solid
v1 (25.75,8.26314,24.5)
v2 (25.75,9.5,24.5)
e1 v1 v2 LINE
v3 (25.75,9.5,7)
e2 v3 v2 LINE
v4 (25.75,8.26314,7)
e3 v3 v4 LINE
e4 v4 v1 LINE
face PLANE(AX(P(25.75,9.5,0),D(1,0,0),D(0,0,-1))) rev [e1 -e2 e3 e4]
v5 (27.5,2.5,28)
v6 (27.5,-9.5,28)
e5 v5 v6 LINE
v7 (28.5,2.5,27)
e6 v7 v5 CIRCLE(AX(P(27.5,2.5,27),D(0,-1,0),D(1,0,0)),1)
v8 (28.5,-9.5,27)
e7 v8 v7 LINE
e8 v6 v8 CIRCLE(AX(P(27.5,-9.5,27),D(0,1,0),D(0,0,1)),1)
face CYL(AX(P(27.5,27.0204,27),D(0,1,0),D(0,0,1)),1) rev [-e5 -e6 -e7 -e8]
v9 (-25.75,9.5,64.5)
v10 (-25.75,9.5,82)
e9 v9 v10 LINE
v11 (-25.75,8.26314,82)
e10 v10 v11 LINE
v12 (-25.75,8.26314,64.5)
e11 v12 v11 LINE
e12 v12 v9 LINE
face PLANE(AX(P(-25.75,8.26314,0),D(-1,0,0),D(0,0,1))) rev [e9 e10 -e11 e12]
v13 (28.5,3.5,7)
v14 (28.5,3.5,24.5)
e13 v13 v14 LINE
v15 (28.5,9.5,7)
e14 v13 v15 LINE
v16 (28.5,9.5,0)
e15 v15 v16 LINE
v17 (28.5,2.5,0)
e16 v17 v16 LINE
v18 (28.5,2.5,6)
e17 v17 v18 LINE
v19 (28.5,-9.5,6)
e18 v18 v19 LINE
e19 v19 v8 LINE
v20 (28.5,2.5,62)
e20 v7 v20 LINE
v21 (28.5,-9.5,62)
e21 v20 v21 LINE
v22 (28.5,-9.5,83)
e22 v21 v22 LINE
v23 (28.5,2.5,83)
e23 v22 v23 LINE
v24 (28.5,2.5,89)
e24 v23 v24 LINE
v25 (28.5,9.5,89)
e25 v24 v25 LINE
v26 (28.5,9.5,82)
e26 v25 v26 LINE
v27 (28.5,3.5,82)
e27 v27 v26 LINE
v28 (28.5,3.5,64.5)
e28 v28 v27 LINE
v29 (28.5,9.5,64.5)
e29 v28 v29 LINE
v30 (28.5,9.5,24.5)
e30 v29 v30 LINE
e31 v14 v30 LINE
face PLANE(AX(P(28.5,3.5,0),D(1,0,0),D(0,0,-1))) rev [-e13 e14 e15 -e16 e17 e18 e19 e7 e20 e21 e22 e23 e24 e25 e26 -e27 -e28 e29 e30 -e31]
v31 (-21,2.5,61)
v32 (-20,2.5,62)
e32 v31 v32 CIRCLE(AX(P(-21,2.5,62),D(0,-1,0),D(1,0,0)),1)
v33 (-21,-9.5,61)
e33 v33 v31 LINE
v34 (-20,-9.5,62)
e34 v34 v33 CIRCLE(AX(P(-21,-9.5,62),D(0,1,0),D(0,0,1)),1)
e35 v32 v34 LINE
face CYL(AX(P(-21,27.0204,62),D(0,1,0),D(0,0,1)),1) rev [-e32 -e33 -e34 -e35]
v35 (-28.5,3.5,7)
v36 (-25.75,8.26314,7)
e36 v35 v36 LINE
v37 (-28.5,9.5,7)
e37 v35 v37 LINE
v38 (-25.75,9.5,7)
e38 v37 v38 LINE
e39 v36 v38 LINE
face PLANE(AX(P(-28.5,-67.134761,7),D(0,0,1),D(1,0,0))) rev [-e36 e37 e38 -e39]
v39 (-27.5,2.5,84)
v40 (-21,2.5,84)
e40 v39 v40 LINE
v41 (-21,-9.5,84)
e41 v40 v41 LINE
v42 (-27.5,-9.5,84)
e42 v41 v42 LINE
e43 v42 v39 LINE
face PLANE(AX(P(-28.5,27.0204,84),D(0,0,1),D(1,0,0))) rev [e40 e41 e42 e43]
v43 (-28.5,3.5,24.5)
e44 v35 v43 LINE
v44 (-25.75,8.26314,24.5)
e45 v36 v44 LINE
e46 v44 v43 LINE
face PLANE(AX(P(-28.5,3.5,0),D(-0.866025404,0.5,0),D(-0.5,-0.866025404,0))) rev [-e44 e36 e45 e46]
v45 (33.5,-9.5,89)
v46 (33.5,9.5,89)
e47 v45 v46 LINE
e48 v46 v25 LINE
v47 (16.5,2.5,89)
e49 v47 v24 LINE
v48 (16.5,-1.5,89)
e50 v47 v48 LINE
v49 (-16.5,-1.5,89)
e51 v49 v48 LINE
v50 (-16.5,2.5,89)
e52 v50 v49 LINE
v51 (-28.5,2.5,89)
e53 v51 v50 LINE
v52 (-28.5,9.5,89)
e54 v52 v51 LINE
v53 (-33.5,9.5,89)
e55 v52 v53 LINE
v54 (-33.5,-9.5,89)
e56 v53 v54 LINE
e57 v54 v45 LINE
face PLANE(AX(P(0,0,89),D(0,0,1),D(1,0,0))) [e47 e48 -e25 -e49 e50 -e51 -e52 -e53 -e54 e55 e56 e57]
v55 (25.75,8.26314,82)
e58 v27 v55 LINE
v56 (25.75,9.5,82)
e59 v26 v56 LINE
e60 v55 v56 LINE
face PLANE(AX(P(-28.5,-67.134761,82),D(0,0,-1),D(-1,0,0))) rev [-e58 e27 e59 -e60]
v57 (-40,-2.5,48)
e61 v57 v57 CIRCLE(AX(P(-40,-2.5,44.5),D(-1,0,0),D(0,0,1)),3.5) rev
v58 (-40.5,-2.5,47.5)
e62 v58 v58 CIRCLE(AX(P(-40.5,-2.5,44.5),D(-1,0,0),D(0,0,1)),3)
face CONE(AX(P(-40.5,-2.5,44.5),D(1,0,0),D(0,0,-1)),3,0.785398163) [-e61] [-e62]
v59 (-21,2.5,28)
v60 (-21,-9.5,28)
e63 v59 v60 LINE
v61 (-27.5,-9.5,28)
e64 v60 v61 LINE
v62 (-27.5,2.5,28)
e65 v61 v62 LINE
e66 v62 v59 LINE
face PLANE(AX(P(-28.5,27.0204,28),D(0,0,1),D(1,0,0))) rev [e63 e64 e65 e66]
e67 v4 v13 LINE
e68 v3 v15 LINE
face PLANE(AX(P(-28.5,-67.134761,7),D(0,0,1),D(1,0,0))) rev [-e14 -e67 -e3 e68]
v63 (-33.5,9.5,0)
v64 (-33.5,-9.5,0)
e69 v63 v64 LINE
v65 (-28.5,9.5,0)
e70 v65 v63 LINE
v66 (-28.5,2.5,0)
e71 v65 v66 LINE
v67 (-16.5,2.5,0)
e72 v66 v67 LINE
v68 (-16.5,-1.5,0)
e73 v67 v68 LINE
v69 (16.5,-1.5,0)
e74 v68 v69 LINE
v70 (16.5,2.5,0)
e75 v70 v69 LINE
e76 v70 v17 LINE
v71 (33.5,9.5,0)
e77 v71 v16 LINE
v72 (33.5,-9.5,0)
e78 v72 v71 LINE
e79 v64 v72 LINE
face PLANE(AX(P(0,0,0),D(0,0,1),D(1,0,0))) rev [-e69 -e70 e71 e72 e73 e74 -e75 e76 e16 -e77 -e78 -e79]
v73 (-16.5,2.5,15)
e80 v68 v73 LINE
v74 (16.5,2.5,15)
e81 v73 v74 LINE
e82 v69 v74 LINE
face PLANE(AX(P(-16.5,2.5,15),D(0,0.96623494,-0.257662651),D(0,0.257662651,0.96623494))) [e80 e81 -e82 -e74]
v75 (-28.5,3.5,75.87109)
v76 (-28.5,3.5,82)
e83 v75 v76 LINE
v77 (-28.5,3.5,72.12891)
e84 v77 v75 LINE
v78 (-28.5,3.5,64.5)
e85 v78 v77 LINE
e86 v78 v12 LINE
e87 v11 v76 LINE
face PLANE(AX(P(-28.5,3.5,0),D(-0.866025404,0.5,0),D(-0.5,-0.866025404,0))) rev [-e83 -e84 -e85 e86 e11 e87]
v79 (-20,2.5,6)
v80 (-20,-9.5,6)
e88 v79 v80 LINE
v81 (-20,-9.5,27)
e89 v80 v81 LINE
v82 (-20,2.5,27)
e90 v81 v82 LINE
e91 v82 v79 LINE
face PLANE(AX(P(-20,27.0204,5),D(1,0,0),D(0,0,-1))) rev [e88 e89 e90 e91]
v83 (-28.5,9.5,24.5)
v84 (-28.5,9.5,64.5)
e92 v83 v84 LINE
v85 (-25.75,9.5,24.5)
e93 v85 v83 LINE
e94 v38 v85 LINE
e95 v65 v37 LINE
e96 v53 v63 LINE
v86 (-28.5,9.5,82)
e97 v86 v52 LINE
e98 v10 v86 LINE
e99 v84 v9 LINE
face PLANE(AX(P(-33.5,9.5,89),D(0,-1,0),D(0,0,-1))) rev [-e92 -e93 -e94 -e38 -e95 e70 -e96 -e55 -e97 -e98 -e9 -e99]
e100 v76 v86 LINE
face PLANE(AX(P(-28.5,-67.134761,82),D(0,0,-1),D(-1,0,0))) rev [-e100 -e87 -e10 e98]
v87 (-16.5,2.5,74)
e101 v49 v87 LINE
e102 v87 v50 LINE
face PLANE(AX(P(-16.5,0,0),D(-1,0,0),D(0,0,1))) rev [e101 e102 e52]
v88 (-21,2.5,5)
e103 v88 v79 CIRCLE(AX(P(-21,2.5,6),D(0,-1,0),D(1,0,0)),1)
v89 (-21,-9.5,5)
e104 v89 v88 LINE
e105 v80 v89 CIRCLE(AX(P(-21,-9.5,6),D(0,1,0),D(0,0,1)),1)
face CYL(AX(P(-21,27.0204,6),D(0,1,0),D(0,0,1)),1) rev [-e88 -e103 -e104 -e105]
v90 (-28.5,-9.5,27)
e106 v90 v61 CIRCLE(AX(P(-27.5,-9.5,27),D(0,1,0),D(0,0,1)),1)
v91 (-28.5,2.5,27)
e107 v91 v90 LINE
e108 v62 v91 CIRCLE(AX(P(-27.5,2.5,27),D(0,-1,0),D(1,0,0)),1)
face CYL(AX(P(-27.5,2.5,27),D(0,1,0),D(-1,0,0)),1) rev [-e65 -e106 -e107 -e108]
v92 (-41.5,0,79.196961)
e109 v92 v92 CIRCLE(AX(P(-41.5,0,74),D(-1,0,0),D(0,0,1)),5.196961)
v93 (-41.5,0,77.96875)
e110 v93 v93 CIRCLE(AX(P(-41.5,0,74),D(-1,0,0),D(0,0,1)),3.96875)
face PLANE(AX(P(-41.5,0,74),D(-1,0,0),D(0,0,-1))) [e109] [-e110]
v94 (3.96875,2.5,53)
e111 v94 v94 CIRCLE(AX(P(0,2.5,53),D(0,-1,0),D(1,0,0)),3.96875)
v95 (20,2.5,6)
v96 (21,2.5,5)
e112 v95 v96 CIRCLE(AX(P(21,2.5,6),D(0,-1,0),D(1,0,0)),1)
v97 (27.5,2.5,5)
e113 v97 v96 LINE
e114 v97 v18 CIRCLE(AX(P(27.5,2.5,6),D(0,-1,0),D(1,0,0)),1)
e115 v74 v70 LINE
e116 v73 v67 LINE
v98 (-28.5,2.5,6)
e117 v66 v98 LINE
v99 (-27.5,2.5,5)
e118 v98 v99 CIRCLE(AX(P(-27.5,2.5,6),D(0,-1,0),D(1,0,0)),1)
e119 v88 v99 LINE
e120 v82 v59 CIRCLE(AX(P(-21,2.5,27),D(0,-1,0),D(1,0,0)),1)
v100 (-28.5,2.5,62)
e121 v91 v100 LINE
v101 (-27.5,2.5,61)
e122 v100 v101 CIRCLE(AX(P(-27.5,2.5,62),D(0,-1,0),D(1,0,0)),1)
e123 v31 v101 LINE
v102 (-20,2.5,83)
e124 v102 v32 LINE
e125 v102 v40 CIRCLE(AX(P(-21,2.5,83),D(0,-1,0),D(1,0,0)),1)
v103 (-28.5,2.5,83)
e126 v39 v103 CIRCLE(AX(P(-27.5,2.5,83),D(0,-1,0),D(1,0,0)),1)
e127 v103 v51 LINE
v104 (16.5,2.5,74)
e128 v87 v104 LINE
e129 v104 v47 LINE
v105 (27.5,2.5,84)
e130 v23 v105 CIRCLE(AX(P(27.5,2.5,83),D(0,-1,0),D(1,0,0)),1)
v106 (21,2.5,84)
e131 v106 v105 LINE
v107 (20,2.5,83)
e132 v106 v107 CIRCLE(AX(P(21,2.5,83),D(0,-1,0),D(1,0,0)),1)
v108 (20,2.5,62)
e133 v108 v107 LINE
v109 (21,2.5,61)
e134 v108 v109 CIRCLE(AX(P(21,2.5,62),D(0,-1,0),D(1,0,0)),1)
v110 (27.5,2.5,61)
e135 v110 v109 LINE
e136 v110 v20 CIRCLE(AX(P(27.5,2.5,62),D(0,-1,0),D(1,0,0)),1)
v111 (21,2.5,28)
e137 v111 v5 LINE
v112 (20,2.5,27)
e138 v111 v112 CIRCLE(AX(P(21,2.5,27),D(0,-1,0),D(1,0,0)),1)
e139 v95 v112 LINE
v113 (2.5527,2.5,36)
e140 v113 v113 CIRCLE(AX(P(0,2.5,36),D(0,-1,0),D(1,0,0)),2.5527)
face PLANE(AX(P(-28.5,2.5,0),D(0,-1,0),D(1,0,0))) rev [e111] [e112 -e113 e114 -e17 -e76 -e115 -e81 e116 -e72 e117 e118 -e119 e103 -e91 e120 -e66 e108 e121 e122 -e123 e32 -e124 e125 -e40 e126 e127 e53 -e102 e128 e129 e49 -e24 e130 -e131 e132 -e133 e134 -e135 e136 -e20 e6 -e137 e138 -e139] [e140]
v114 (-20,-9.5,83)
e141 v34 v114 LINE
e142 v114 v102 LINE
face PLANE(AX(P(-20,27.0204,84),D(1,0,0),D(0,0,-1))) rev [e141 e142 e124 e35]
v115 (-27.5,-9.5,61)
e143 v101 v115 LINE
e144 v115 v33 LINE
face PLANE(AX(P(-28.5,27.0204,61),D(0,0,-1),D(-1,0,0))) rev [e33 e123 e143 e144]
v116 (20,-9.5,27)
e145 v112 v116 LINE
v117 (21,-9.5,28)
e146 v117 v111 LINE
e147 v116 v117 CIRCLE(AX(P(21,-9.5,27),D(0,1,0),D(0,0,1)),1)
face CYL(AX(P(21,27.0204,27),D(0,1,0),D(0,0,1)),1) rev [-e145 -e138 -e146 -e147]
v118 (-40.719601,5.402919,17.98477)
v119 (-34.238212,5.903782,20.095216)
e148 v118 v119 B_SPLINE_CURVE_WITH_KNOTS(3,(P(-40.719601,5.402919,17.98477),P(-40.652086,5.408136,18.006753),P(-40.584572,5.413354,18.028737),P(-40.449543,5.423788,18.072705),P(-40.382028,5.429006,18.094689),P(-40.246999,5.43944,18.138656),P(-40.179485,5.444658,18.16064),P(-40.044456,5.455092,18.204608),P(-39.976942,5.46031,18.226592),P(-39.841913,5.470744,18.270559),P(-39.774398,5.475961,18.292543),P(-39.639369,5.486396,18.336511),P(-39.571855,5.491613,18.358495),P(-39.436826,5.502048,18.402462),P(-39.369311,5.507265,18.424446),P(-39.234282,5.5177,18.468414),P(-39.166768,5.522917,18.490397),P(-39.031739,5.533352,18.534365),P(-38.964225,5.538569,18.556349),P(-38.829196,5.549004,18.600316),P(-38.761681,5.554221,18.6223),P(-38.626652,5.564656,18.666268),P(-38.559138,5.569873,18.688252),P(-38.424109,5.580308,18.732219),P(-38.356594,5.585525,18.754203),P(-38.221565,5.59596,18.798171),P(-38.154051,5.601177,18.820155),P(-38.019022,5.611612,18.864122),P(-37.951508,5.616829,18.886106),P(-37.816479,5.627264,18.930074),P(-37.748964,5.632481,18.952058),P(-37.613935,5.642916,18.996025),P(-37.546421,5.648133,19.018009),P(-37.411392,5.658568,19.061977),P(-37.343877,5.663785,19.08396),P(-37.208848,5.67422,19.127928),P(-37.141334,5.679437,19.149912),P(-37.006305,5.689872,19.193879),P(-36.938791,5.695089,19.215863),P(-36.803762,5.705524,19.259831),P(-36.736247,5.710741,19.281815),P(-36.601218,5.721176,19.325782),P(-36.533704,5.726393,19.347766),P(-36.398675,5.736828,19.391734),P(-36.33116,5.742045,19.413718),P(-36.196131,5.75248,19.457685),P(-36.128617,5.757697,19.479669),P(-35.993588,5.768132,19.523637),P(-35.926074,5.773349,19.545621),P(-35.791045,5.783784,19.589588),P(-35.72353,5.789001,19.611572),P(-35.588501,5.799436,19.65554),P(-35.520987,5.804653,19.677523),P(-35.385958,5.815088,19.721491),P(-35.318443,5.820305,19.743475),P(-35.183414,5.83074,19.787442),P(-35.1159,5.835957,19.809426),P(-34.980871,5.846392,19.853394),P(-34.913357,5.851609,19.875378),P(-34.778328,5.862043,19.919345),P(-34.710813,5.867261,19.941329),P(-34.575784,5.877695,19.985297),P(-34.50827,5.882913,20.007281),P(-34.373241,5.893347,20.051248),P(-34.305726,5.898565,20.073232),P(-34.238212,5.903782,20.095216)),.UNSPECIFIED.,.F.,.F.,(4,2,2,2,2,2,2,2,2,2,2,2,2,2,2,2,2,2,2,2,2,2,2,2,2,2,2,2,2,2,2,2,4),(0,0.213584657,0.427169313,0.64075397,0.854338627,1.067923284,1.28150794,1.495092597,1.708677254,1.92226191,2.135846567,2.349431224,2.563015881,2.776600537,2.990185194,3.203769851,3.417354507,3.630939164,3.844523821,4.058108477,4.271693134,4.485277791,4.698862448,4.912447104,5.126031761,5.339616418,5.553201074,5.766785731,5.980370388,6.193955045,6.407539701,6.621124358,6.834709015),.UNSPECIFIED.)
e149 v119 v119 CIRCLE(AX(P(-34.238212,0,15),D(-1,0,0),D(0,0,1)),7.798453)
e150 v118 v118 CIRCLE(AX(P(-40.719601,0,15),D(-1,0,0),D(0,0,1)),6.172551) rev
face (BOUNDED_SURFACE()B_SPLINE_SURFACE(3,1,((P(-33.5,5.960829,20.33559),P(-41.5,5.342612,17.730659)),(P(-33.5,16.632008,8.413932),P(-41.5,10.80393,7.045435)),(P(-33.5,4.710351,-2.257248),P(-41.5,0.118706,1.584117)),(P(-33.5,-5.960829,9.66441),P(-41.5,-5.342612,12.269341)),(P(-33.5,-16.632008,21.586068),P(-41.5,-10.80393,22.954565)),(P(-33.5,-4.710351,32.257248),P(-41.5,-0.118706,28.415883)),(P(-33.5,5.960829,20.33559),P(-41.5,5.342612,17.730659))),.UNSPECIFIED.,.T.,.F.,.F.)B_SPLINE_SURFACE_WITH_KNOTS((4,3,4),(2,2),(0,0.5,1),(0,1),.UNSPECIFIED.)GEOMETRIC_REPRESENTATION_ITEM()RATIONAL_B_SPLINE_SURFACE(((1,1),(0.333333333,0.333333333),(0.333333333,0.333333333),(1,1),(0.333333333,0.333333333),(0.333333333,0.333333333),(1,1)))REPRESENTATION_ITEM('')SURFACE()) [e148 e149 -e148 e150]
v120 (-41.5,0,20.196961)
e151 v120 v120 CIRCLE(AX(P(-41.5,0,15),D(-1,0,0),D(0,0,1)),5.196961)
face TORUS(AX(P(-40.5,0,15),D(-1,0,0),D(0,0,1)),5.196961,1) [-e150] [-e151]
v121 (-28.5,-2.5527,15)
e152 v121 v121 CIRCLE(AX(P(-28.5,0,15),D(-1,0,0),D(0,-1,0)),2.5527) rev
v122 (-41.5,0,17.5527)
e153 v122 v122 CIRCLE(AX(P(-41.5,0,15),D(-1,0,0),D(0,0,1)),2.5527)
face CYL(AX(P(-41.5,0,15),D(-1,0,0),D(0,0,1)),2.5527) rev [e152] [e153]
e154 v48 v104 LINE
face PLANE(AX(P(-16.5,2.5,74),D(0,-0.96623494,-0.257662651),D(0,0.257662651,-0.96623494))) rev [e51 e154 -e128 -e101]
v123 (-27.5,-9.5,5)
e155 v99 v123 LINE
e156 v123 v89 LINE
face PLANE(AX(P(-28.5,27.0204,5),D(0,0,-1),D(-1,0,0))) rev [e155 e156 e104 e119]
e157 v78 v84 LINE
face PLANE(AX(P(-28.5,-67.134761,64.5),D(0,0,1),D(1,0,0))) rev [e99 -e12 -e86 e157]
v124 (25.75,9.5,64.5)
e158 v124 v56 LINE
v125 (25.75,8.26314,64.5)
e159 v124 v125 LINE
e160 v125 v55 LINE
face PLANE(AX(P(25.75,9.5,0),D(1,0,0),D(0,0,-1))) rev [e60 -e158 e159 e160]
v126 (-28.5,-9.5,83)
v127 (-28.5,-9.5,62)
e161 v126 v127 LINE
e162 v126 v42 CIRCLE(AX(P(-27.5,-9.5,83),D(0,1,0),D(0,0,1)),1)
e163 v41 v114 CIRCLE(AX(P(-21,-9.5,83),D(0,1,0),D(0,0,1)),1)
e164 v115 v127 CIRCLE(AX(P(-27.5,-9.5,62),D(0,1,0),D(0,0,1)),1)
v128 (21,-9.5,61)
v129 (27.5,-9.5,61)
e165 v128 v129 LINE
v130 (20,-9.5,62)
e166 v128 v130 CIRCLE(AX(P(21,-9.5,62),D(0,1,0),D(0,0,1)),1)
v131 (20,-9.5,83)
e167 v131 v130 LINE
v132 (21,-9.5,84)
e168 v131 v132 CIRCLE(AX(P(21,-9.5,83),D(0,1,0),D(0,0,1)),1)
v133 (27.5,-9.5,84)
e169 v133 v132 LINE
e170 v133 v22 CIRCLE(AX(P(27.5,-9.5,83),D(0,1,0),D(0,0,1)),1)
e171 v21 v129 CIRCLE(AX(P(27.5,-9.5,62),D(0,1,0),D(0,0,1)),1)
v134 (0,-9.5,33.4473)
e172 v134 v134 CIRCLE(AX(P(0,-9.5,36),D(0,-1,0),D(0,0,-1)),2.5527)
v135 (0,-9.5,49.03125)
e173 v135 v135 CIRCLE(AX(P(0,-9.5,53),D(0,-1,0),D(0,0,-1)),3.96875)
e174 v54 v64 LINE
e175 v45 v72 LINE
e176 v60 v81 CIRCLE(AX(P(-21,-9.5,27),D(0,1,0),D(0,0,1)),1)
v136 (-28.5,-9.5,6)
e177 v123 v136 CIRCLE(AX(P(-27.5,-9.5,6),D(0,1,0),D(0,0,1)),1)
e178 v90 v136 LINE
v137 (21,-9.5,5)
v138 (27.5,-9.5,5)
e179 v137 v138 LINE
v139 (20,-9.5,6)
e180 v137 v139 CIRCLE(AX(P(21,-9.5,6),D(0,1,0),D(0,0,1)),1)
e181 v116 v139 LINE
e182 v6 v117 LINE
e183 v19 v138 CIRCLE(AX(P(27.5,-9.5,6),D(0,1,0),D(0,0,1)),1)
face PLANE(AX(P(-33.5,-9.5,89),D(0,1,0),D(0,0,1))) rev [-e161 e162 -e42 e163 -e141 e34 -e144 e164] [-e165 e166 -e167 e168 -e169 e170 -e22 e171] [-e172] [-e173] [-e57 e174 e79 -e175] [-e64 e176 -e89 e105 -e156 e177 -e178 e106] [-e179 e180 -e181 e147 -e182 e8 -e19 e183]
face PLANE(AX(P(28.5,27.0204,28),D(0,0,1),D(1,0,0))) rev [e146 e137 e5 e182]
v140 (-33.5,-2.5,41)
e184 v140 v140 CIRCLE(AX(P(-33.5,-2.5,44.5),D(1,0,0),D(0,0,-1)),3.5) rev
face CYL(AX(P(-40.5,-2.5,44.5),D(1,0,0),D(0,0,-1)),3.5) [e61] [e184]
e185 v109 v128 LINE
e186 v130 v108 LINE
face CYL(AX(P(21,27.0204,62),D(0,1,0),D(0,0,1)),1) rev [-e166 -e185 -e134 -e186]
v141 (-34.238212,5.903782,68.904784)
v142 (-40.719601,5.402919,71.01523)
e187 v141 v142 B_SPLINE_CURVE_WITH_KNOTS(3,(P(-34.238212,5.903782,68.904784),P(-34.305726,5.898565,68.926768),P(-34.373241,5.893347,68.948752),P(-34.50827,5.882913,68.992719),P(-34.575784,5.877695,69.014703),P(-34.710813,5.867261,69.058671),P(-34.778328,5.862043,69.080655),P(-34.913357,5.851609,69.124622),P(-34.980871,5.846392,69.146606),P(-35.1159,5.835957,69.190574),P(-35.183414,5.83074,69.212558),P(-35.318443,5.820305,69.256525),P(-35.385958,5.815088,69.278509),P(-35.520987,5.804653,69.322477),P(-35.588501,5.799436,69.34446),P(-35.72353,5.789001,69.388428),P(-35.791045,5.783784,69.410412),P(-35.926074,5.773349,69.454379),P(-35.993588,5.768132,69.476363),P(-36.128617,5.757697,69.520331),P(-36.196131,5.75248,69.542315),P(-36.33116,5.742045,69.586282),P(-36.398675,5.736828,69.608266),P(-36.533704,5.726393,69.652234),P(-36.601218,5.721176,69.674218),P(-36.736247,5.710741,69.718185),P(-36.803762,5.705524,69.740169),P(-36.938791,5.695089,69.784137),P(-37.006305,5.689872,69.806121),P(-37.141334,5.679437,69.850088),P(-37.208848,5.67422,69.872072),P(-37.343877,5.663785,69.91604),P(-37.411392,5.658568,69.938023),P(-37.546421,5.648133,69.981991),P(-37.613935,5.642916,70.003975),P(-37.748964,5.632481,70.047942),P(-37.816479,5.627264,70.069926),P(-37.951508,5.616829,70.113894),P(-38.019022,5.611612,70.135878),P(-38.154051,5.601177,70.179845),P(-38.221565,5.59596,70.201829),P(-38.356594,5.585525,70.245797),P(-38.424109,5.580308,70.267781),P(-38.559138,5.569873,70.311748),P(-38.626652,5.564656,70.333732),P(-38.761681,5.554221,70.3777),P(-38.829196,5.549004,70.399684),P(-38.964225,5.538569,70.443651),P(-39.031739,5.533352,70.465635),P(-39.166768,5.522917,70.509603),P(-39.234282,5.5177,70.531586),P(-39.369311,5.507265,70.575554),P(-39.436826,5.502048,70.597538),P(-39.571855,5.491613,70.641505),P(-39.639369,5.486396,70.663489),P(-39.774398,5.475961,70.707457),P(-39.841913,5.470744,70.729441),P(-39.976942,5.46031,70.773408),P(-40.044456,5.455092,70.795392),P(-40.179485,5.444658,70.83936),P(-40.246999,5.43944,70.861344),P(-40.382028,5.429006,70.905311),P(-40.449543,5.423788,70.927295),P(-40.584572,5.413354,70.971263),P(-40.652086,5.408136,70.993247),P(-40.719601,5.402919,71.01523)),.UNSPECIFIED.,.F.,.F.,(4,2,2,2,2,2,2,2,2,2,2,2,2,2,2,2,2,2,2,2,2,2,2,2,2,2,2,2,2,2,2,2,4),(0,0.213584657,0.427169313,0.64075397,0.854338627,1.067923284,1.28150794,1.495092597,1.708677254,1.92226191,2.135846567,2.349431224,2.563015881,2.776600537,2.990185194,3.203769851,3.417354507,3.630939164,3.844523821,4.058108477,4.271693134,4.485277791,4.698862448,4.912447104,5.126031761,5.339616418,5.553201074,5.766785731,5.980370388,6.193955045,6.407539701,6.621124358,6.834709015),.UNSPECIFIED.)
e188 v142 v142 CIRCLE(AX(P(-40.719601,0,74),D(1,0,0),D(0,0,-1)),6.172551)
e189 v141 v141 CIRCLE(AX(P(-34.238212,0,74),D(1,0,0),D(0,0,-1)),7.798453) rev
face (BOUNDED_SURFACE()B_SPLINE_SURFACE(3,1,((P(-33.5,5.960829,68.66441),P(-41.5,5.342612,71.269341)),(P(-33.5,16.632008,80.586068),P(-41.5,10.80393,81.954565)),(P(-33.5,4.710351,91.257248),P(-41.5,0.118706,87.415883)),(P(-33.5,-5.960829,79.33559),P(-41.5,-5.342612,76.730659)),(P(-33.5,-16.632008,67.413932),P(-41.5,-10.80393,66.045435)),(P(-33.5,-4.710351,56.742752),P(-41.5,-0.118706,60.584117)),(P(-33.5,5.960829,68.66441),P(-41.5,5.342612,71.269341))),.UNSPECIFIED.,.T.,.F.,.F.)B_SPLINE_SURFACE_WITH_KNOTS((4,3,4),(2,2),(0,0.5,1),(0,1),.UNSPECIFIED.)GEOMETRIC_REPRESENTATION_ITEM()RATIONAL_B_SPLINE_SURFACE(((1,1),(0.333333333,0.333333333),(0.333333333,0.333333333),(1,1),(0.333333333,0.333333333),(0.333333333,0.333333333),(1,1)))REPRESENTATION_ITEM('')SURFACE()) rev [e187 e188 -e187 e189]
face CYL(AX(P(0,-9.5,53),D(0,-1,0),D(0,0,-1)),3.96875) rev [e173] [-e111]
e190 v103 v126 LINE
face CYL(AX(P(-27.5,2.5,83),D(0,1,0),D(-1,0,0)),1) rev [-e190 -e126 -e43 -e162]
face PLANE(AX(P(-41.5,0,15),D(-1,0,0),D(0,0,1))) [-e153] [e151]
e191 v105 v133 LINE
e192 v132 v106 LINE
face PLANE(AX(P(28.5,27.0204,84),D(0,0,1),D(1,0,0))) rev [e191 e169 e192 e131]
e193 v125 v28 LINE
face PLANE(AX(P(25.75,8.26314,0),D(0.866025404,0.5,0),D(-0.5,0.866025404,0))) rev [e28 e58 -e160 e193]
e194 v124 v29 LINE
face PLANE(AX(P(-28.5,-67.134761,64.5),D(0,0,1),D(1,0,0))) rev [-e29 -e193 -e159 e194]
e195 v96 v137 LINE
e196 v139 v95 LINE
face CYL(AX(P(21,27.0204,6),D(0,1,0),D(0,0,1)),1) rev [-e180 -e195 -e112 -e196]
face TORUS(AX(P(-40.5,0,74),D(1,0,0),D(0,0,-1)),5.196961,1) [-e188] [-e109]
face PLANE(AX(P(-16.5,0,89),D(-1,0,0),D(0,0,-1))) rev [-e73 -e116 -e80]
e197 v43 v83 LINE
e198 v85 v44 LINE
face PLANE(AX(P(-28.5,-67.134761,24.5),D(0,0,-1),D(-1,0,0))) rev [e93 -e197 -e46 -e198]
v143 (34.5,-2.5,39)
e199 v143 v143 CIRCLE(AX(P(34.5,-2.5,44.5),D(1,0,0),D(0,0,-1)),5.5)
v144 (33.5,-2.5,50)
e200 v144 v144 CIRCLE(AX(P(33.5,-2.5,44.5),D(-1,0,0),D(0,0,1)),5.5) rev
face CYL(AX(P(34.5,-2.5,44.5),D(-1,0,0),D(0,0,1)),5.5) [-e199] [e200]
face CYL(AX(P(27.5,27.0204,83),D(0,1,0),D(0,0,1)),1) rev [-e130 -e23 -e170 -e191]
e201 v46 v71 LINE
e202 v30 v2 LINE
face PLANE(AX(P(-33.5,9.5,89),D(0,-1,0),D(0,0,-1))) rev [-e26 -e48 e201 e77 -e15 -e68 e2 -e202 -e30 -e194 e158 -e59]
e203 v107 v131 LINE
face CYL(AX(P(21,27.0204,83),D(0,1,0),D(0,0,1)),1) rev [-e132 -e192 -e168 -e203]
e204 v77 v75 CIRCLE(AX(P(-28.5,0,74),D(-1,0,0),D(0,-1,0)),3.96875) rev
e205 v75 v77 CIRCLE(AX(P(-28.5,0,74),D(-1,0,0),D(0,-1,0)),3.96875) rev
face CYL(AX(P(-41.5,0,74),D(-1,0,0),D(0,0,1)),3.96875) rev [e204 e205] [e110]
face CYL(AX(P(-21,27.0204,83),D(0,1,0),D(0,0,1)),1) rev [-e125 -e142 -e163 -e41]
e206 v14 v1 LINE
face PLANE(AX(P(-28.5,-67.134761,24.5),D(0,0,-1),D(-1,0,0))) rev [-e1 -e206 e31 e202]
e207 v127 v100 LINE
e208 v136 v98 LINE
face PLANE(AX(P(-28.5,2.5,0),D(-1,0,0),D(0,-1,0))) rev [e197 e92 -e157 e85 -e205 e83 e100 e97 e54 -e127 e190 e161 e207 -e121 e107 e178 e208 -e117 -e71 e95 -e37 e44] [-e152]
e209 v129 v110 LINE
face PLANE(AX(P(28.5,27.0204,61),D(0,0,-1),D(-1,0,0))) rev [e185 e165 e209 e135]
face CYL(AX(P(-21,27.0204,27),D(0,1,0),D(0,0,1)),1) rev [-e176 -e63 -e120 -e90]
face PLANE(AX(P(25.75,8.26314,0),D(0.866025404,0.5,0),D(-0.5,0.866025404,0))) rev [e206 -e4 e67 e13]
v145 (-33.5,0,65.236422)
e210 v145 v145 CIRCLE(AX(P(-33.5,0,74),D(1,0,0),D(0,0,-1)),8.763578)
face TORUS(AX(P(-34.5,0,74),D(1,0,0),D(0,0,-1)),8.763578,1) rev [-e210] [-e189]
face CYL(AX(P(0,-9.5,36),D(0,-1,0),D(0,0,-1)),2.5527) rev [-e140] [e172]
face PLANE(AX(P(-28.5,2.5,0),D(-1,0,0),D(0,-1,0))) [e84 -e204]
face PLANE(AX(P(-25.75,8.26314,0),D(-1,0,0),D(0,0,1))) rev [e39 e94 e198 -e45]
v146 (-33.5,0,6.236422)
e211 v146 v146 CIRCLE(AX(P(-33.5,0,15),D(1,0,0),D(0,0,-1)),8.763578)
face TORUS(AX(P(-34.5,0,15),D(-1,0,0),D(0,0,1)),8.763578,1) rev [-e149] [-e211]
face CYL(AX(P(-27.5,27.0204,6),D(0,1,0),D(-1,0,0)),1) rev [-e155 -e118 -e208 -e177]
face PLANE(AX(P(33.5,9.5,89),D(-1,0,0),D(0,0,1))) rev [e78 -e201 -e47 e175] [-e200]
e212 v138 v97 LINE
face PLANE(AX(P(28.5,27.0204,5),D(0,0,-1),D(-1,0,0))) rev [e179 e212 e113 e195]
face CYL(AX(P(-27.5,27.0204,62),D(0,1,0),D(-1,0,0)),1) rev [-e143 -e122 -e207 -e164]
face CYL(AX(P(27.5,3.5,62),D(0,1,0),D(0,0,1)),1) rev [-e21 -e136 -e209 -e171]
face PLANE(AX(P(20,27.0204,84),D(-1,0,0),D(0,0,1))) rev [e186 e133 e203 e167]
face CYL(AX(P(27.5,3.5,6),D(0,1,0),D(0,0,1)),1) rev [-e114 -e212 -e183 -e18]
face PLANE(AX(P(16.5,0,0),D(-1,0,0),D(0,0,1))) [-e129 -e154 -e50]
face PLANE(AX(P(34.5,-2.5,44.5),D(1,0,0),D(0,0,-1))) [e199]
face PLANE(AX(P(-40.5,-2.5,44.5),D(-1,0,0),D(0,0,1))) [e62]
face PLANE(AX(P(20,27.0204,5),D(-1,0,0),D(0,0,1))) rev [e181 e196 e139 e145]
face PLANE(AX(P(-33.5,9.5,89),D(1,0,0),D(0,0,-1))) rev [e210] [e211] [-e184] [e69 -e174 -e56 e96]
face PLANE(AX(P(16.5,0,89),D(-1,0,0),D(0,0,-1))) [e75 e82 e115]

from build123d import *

# Parameters (mm, degrees)
SKETCH_1_W                    = 67
SKETCH_1_H                    = 19
EXTRUDE_1_DEPTH               = 89
CUT_EXTRUDE_1_DEPTH           = 96.56934655
CUT_EXTRUDE_2_REACH           = 98.976
SKETCH_3_W                    = 57
SKETCH_3_H                    = 7
SKETCH_3_H_2                  = 40
SKETCH_4_W                    = 8.5
SKETCH_4_H                    = 23
CUT_EXTRUDE_3_DEPTH           = 12
HOLE_WIZARD_1_4_201_D         = 5.1054
HOLE_WIZARD_3_8_161_D         = 7.9375
HOLE_WIZARD_3_8_161_DEPTH     = 26.99
HOLE_WIZARD_3_8_161_TIP       = 2.384665582
FILLET_1_R                    = 1
HOLE_START                    = -41.5
HOLE_WIZARD_3_8_162_OUTLINE_R = 3.96875
HOLE_WIZARD_3_8_162_DEPTH     = 13
HOLE_WIZARD_1_4_202_REACH     = 118.774
HOLE_WIZARD_1_4_202_BORE_R    = 2.5527
SKETCH_17_R                   = 3.5
EXTRUDE_2_DEPTH               = 7
FILLET_2_R                    = 1
CHAMFER_1_SIZE                = 0.5
CUT_EXTRUDE_4_DEPTH           = 33
SKETCH_19_R                   = 5.5
EXTRUDE_3_DEPTH               = 1


with BuildPart() as part:
    # Эскиз1 → Бобышка-Вытянуть1 (new body)
    with BuildSketch(Plane.XY):
        Rectangle(SKETCH_1_W, SKETCH_1_H)
    extrude(amount=EXTRUDE_1_DEPTH)

    # Эскиз2 → Вырез-Вытянуть1 (cut, through all)
    with BuildSketch(Plane.XY.offset(89)):
        Polygon((-28.5, 2.5), (28.5, 2.5), (28.5, 3.5), (25.75, 8.263139721), (25.75, 9.5), (-25.75, 9.5), (-25.75, 8.263139721), (-28.5, 3.5), align=None)
    extrude(amount=-CUT_EXTRUDE_1_DEPTH, mode=Mode.SUBTRACT)

    # Вырез-Вытянуть2: up to this face of the body (flat: up to its plane)
    cut_extrude_2_end = Plane(part.part.faces().sort_by_distance((0, 2.5, 44.5))[0])
    # Эскиз3 → Вырез-Вытянуть2 (cut, up to the picked face)
    with BuildSketch(Plane(origin=(0, 9.5, 0), x_dir=(1, 0, 0), z_dir=(0, 1, 0)), mode=Mode.PRIVATE) as cut_extrude_2_sk1:
        with Locations((0, -85.5)):
            Rectangle(SKETCH_3_W, SKETCH_3_H)
    cut_extrude_2_tool1 = split(extrude(cut_extrude_2_sk1.sketch, amount=-CUT_EXTRUDE_2_REACH, mode=Mode.PRIVATE), bisect_by=cut_extrude_2_end, keep=Keep.BOTH, mode=Mode.PRIVATE)
    # Эскиз3 → Вырез-Вытянуть2 (cut, up to the picked face)
    with BuildSketch(Plane(origin=(0, 9.5, 0), x_dir=(1, 0, 0), z_dir=(0, 1, 0)), mode=Mode.PRIVATE) as cut_extrude_2_sk2:
        with Locations((0, -44.5)):
            Rectangle(SKETCH_3_W, SKETCH_3_H_2)
    cut_extrude_2_tool2 = split(extrude(cut_extrude_2_sk2.sketch, amount=-CUT_EXTRUDE_2_REACH, mode=Mode.PRIVATE), bisect_by=cut_extrude_2_end, keep=Keep.BOTH, mode=Mode.PRIVATE)
    # Эскиз3 → Вырез-Вытянуть2 (cut, up to the picked face)
    with BuildSketch(Plane(origin=(0, 9.5, 0), x_dir=(1, 0, 0), z_dir=(0, 1, 0)), mode=Mode.PRIVATE) as cut_extrude_2_sk3:
        with Locations((0, -3.5)):
            Rectangle(SKETCH_3_W, SKETCH_3_H)
    cut_extrude_2_tool3 = split(extrude(cut_extrude_2_sk3.sketch, amount=-CUT_EXTRUDE_2_REACH, mode=Mode.PRIVATE), bisect_by=cut_extrude_2_end, keep=Keep.BOTH, mode=Mode.PRIVATE)
    add(cut_extrude_2_tool1.solids().sort_by(Axis((0, 9.5, 85.5), (0, -1, 0)))[0], mode=Mode.SUBTRACT)
    add(cut_extrude_2_tool2.solids().sort_by(Axis((0, 9.5, 44.5), (0, -1, 0)))[0], mode=Mode.SUBTRACT)
    add(cut_extrude_2_tool3.solids().sort_by(Axis((0, 9.5, 3.5), (0, -1, 0)))[0], mode=Mode.SUBTRACT)

    # Эскиз4 → Вырез-Вытянуть3 (cut)
    with BuildSketch(Plane.XZ.offset(9.5)):
        with Locations((-24.25, 72.5)):
            Rectangle(SKETCH_4_W, SKETCH_4_H)
        with Locations((24.25, 72.5)):
            Rectangle(SKETCH_4_W, SKETCH_4_H)
        with Locations((-24.25, 16.5)):
            Rectangle(SKETCH_4_W, SKETCH_4_H)
        with Locations((24.25, 16.5)):
            Rectangle(SKETCH_4_W, SKETCH_4_H)
    extrude(amount=-CUT_EXTRUDE_3_DEPTH, mode=Mode.SUBTRACT)

    # Отверстие обработанное метчиком 1/4-201 (through all)
    with Locations(Plane(origin=(0, -9.5, 0), x_dir=(-1, 0, 0), z_dir=(0, -1, 0))):
        with Locations((0, -36)):
            Hole(HOLE_WIZARD_1_4_201_D / 2)

    # Отверстие обработанное метчиком 3/8-161
    with Locations(Plane(origin=(0, -9.5, 0), x_dir=(-1, 0, 0), z_dir=(0, -1, 0))):
        with Locations((0, -53)):
            Hole(HOLE_WIZARD_3_8_161_D / 2, depth=HOLE_WIZARD_3_8_161_DEPTH)
            with Locations((0, 0, -(HOLE_WIZARD_3_8_161_DEPTH + HOLE_WIZARD_3_8_161_TIP / 2))):  # 118° drill point
                Cone(0, HOLE_WIZARD_3_8_161_D / 2, HOLE_WIZARD_3_8_161_TIP, mode=Mode.SUBTRACT)

    # Скругление1
    fillet_1_edges = [part.edges().sort_by_distance(p)[0] for p in [
        (-20, -3.5, 84),
        (-20, -3.5, 61),
        (-28.5, -3.5, 61),
        (-28.5, -3.5, 84),
        (20, -3.5, 84),
        (28.5, -3.5, 84),
        (28.5, -3.5, 61),
        (20, -3.5, 61),
        (-28.5, -3.5, 5),
        (-28.5, -3.5, 28),
        (-20, -3.5, 28),
        (-20, -3.5, 5),
        (28.5, -3.5, 28),
        (28.5, -3.5, 5),
        (20, -3.5, 5),
        (20, -3.5, 28),
    ]]
    fillet(fillet_1_edges, radius=FILLET_1_R)

    # По сечениям1: read off the stored shape, not the designer's step
    # По сечениям1: loft between two sections, ruled curve by curve
    loft_1_from = [
        Edge.make_bspline([(-33.5, 5.960828972, 20.335589749), (-33.5, 16.63200847, 8.413931805), (-33.5, 4.710350526, -2.257247693), (-33.5, -5.960828972, 9.664410251), (-33.5, -16.63200847, 21.586068195), (-33.5, -4.710350526, 32.257247693), (-33.5, 5.960828972, 20.335589749)], [0, 0, 0, 0, 0.5, 0.5, 0.5, 1, 1, 1, 1], 3, [1, 0.333333333, 0.333333333, 1, 0.333333333, 0.333333333, 1]),
    ]
    loft_1_to = [
        Edge.make_bspline([(-41.5, 5.342611917, 17.730658877), (-41.5, 10.803929671, 7.045435042), (-41.5, 0.118705836, 1.584117289), (-41.5, -5.342611917, 12.269341123), (-41.5, -10.803929671, 22.954564958), (-41.5, -0.118705836, 28.415882711), (-41.5, 5.342611917, 17.730658877)], [0, 0, 0, 0, 0.5, 0.5, 0.5, 1, 1, 1, 1], 3, [1, 0.333333333, 0.333333333, 1, 0.333333333, 0.333333333, 1]),
    ]
    loft_1 = Solid(Shell([*[Face.make_surface_from_curves(loft_1_from[k], loft_1_to[k]) for k in range(1)], Face(Wire(loft_1_from)), Face(Wire(loft_1_to))]))
    add(loft_1)

    # Зеркальное отражение1: По сечениям1 across plane
    add(loft_1.mirror(Plane.XY.offset(44.5)))

    # Отверстие обработанное метчиком 3/8-162: read off the stored shape, not the designer's step
    # Отверстие обработанное метчиком 3/8-162 outline → Отверстие обработанное метчиком 3/8-162 (cut)
    with BuildSketch(Plane.YZ.offset(HOLE_START)):
        with Locations((0, 74)):
            Circle(HOLE_WIZARD_3_8_162_OUTLINE_R)
    extrude(amount=HOLE_WIZARD_3_8_162_DEPTH, mode=Mode.SUBTRACT)

    # Отверстие обработанное метчиком 1/4-202 bore → Отверстие обработанное метчиком 1/4-202 (cut, up to next)
    with BuildSketch(Plane.ZY.offset(41.5), mode=Mode.PRIVATE) as hole_wizard_1_4_202_sk1:
        with Locations((15, 0)):
            Circle(HOLE_WIZARD_1_4_202_BORE_R)
    hole_wizard_1_4_202_tool1 = extrude(hole_wizard_1_4_202_sk1.sketch, amount=-HOLE_WIZARD_1_4_202_REACH, mode=Mode.PRIVATE) & part.part
    add(hole_wizard_1_4_202_tool1.solids().sort_by_distance((-41.5, 0, 15))[0], mode=Mode.SUBTRACT)

    # Эскиз17 → Бобышка-Вытянуть2 (add)
    with BuildSketch(Plane.ZY.offset(33.5)):
        with Locations(Location((44.5, -2.5, 0), (0, 0, 180))):
            Circle(SKETCH_17_R)
    extrude(amount=EXTRUDE_2_DEPTH)

    # Скругление2
    fillet_2_edges = [part.edges().sort_by_distance(p)[0] for p in [
        (-41.5, -5.342611917, 12.269341123),
        (-33.5, -5.960828972, 9.664410251),
        (-33.5, -5.960828972, 79.335589749),
        (-41.5, -5.342611917, 76.730658877),
    ]]
    fillet(fillet_2_edges, radius=FILLET_2_R)

    # Фаска1
    chamfer_1_edges = [part.edges().sort_by_distance(p)[0] for p in [
        (-40.5, -2.5, 48),
    ]]
    chamfer(chamfer_1_edges, length=CHAMFER_1_SIZE)

    # Эскиз18 → Вырез-Вытянуть4 (cut)
    with BuildSketch(Plane(origin=(16.5, 0, 0), x_dir=(0, 0, -1), z_dir=(1, 0, 0))):
        Polygon((-89, -1.5), (-89, 2.5), (-74, 2.5), align=None)
    cut_extrude_4 = extrude(amount=-CUT_EXTRUDE_4_DEPTH, mode=Mode.SUBTRACT)

    # Зеркальное отражение2: Вырез-Вытянуть4 across plane
    add(cut_extrude_4.mirror(Plane.XY.offset(44.5)), mode=Mode.SUBTRACT)

    # Эскиз19 → Бобышка-Вытянуть3 (add)
    with BuildSketch(Plane(origin=(33.5, 0, 0), x_dir=(0, 0, -1), z_dir=(1, 0, 0))):
        with Locations(Location((-44.5, -2.5, 0), (0, 0, 180))):
            Circle(SKETCH_19_R)
    extrude(amount=EXTRUDE_3_DEPTH)


solid = part.part
